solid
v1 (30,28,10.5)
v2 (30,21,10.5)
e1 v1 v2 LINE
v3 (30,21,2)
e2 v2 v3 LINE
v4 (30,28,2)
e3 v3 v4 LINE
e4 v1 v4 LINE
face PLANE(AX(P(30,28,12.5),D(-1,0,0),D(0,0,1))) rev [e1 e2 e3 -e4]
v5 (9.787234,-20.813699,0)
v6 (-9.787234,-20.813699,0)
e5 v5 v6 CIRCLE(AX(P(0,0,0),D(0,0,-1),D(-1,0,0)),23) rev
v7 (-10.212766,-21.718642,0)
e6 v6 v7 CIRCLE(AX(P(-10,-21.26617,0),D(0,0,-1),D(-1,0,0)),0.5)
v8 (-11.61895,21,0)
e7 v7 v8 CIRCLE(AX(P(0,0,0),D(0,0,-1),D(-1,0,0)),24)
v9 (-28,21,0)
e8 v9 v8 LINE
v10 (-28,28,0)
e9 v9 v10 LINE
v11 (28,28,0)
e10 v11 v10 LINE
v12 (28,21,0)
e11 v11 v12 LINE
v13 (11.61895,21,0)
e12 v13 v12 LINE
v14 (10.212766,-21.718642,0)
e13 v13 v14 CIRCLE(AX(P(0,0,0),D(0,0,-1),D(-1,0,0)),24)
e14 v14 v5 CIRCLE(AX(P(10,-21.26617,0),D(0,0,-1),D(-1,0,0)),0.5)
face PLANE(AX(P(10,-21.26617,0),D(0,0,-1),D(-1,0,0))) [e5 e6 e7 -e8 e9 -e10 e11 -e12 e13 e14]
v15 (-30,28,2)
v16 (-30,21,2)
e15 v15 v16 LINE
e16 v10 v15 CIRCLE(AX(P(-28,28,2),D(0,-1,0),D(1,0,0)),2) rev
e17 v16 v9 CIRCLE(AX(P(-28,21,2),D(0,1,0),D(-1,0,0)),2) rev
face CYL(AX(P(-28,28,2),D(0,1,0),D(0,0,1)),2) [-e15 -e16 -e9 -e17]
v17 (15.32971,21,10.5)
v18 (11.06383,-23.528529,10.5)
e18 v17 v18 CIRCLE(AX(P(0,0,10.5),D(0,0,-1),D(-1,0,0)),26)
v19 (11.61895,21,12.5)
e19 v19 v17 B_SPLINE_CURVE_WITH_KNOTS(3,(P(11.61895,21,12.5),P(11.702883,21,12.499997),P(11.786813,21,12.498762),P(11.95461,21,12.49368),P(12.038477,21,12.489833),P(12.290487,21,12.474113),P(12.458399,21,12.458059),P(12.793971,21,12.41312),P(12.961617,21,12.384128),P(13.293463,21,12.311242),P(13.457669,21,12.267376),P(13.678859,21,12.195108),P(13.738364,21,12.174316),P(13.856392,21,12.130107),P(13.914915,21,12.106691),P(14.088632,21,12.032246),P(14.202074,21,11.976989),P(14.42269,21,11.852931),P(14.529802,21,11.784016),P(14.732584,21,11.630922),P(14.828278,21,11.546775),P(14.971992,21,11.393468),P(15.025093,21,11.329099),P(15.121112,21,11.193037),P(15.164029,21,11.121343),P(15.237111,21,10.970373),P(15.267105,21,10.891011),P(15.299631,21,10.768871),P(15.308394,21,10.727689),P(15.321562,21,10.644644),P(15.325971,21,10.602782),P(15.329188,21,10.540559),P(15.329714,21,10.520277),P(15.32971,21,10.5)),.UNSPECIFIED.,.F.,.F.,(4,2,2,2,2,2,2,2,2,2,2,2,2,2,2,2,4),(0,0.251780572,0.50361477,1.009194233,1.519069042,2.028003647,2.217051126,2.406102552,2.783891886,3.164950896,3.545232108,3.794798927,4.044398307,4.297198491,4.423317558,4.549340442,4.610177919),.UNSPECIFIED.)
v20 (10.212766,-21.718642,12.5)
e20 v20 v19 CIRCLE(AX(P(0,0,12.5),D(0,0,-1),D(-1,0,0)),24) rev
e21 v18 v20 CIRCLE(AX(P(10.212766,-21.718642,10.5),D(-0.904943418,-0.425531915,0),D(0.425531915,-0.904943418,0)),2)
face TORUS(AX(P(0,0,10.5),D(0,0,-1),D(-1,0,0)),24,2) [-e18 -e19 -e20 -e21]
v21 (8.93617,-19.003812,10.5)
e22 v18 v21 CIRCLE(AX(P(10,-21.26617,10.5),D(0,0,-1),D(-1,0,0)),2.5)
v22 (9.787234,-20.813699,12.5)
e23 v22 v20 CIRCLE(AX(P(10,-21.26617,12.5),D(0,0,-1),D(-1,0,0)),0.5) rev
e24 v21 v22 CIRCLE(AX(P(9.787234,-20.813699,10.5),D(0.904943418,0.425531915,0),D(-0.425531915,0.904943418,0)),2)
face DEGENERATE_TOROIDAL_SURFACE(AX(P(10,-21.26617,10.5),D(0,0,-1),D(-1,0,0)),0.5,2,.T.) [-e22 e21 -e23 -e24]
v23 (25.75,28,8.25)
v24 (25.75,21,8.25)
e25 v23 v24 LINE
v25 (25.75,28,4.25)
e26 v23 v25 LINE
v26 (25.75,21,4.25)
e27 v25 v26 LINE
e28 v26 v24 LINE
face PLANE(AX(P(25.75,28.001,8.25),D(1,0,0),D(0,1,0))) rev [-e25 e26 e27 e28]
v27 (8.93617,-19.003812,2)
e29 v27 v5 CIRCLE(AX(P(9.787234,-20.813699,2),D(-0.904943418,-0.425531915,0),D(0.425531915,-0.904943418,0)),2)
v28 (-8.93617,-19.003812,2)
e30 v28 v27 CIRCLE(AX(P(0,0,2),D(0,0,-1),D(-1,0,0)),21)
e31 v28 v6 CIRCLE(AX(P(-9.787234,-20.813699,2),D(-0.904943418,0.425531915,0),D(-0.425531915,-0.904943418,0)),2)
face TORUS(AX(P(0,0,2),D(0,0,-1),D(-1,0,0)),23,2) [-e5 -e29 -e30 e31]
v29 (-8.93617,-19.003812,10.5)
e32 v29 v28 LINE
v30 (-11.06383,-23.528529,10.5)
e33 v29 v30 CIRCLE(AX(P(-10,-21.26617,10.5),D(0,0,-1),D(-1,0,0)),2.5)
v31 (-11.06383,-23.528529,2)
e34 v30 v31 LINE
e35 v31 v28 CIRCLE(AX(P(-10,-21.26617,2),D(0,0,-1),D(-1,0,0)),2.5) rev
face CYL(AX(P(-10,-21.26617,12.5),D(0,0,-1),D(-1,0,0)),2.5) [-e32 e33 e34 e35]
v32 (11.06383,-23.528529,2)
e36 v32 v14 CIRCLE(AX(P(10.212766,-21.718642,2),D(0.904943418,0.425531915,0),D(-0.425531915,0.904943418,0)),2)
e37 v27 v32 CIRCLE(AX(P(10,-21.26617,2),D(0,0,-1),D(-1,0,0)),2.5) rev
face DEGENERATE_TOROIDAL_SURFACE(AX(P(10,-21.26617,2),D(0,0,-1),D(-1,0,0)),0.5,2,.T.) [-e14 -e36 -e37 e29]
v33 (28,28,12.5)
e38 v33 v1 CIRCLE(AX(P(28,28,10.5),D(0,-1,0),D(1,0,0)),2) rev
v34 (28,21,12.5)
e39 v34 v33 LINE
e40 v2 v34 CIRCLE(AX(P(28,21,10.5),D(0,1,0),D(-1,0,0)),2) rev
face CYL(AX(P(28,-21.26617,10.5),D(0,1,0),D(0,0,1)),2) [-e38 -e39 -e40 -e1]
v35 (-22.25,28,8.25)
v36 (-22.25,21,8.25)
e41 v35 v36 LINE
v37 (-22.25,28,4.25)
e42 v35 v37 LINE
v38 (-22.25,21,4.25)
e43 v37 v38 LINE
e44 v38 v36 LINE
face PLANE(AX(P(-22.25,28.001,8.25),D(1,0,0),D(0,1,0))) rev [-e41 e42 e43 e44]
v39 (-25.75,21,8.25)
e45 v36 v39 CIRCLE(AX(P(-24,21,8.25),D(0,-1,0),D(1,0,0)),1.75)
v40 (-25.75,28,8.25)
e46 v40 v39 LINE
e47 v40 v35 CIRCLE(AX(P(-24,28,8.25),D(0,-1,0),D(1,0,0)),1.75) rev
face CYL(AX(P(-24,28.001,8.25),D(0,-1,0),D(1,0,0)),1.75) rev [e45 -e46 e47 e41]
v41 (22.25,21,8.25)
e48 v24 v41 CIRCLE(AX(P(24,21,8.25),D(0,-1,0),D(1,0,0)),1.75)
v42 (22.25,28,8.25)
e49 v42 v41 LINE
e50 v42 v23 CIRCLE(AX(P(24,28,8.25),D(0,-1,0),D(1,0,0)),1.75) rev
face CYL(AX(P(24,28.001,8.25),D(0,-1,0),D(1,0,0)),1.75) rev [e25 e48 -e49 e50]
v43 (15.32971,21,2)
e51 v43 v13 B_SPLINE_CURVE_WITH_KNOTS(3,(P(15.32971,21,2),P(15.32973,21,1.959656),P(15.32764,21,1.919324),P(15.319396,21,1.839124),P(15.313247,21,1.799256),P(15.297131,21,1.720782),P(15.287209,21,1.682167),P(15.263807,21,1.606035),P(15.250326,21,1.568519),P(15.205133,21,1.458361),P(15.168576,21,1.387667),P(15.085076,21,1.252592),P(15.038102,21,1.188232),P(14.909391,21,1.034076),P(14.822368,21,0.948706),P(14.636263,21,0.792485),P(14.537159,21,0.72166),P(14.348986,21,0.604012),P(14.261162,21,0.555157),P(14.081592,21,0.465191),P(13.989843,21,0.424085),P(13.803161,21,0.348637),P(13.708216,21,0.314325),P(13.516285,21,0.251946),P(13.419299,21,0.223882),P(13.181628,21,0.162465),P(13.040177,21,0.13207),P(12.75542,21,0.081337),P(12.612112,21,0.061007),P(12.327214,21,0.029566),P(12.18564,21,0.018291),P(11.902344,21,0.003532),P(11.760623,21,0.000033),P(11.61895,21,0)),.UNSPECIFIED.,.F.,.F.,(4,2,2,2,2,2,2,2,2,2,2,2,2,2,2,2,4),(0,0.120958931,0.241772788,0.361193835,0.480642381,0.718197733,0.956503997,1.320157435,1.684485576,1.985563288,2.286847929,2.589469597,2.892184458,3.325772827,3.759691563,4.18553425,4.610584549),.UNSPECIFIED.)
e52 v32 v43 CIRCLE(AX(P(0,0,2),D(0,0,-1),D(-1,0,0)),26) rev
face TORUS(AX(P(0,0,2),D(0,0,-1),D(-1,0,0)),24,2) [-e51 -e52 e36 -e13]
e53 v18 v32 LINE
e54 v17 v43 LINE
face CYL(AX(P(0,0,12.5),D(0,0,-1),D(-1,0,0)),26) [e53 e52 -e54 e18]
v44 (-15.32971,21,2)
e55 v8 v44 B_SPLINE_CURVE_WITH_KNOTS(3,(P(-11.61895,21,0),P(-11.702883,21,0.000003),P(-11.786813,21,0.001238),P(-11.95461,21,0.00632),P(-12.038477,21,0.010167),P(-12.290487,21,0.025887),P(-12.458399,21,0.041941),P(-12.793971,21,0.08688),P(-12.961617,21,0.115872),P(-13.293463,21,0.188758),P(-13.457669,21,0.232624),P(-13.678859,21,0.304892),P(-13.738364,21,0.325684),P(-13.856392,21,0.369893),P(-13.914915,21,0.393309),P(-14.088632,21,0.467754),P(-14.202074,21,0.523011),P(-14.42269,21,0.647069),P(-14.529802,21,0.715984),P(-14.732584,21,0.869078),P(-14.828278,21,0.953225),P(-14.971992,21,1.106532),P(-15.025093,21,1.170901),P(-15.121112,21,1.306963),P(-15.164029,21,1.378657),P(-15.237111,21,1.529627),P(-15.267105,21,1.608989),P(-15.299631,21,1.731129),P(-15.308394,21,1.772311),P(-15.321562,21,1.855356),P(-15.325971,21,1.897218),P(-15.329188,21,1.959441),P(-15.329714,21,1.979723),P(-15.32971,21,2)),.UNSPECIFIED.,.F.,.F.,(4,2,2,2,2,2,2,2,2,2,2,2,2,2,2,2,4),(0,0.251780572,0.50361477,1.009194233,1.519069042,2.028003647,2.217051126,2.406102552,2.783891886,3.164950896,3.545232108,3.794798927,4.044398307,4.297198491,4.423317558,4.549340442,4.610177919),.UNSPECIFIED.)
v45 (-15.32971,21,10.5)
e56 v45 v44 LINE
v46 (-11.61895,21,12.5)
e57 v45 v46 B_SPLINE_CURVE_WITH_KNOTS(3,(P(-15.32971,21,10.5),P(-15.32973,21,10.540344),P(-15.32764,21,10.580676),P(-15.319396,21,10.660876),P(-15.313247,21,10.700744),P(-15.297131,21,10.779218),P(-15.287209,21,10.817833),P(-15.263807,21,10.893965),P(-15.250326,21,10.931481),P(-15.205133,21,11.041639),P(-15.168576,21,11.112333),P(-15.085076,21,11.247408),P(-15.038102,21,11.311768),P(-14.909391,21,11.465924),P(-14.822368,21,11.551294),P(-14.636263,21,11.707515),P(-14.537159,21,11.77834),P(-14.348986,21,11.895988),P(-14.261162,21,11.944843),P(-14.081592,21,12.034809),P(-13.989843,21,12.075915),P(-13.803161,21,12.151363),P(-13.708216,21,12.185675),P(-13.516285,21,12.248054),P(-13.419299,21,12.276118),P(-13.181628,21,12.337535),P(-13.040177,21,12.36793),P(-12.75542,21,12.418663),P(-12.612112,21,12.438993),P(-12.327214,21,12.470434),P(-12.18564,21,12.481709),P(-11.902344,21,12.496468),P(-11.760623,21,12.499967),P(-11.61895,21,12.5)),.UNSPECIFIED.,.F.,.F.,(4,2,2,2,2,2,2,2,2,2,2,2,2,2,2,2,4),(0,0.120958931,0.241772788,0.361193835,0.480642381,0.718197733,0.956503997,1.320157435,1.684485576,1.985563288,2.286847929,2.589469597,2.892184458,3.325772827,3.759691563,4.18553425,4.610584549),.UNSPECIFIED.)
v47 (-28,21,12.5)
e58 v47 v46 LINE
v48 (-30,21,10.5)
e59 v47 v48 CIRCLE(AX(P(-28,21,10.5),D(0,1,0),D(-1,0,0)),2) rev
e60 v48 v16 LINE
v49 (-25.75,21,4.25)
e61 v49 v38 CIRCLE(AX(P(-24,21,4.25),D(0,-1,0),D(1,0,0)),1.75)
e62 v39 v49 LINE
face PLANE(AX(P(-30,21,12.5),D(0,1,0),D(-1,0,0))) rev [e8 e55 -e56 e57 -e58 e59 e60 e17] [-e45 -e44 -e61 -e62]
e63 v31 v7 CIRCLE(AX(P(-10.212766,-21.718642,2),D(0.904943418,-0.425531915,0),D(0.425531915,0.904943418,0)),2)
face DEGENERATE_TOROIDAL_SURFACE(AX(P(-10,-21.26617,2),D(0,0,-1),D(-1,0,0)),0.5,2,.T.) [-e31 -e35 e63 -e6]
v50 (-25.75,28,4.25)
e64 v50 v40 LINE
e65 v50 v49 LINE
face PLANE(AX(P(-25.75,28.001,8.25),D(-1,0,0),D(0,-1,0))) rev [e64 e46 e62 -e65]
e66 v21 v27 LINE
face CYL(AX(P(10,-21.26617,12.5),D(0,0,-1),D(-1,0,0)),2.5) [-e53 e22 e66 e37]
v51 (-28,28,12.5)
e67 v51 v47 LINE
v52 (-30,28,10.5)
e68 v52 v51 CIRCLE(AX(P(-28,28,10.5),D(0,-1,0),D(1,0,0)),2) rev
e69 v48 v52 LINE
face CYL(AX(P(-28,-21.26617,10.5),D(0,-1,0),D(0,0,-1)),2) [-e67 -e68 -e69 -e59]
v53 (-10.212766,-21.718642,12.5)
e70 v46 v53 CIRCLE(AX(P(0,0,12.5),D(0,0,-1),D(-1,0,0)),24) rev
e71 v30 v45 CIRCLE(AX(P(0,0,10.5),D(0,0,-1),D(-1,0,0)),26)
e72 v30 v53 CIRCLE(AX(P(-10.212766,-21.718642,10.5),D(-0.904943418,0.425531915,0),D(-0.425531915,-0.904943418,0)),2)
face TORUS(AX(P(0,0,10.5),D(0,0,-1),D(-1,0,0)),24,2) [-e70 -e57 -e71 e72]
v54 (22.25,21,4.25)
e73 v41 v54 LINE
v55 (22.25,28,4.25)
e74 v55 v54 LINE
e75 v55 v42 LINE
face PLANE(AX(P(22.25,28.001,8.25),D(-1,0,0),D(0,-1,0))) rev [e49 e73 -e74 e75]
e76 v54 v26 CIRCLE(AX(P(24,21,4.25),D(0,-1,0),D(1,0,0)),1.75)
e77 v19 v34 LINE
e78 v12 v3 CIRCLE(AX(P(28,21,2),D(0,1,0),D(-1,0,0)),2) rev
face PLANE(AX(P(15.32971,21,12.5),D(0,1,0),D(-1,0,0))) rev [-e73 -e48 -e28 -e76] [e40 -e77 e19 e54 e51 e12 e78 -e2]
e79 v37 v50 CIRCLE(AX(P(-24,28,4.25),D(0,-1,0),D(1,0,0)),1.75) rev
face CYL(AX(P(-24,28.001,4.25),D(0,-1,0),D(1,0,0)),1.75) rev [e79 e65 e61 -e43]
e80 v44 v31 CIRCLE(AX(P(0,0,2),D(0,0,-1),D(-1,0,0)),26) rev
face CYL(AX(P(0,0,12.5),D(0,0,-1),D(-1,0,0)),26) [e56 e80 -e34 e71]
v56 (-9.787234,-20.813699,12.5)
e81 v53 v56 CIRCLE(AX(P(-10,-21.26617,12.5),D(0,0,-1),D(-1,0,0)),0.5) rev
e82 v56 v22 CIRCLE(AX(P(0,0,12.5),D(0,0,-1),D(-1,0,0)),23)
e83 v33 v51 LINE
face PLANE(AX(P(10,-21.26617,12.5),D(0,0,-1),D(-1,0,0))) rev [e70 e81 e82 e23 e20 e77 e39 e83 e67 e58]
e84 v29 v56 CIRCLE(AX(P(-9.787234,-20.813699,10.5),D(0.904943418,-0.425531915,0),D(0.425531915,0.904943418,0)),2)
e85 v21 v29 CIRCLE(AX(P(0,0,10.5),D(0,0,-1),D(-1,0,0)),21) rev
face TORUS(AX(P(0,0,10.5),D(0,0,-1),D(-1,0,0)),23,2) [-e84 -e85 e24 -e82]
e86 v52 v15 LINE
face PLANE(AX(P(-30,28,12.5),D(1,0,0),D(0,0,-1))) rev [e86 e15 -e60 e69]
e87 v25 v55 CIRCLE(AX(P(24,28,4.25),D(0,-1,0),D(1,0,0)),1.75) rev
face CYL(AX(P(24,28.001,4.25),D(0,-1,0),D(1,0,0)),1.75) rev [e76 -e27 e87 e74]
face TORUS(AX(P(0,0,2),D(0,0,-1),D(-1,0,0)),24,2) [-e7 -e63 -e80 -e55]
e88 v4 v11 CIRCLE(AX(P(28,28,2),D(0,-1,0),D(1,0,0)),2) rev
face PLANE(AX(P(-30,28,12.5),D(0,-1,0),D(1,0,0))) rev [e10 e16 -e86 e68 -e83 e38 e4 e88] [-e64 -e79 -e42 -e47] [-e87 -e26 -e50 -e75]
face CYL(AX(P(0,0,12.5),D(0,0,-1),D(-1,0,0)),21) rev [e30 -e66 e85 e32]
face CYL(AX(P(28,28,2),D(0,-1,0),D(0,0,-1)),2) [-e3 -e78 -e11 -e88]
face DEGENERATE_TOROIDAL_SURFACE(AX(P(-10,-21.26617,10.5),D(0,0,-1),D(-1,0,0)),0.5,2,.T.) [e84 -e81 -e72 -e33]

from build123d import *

# Parameters (mm, degrees)
SALIENTE_EXTRUIR1_DEPTH = 12.5
REDONDEO1_R             = 2
CORTAR_EXTRUIR1_REACH   = 57.32


with BuildPart() as part:
    # Croquis1 → Saliente-Extruir1 (new body)
    with BuildSketch(Plane.XY):
        with BuildLine():
            Line((-30, 28), (30, 28))
            Line((30, 28), (30, 21))
            Line((30, 21), (15.329709717, 21))
            ThreePointArc((15.329709717, 21), (25.881503097, -2.479475236), (11.063829787, -23.528528863))
            ThreePointArc((11.063829787, -23.528528863), (7.737641456, -22.330000105), (8.936170213, -19.003811774))
            ThreePointArc((8.936170213, -19.003811774), (0, 21), (-8.936170213, -19.003811774))
            ThreePointArc((-8.936170213, -19.003811774), (-7.737641456, -22.330000105), (-11.063829787, -23.528528863))
            ThreePointArc((-11.063829787, -23.528528863), (-25.881503097, -2.479475236), (-15.329709717, 21))
            Line((-15.329709717, 21), (-30, 21))
            Line((-30, 21), (-30, 28))
        make_face()
    extrude(amount=SALIENTE_EXTRUIR1_DEPTH)

    # Redondeo1
    # the kernel refuses this fillet: 2 mm, written as the material it takes off along each edge
    with BuildSketch(Plane(origin=(0, 0, 0), x_dir=(-0.4255319148936173, -0.9049434177930525, 0), z_dir=(0.9049434177930525, -0.4255319148936173, 0))) as redondeo1_piece_1_section:
        with BuildLine():
            CenterArc((26 - REDONDEO1_R, -REDONDEO1_R), REDONDEO1_R, 0, 90)
            Line((26 - REDONDEO1_R, 0), (26, 0))
            Line((26, 0), (26, -REDONDEO1_R))
        make_face()
    redondeo1_piece_1 = revolve(axis=Axis((0, 0, 0), (0, 0, -1)), revolution_arc=129.712854224, mode=Mode.PRIVATE)
    redondeo1_piece_1 = split(redondeo1_piece_1, bisect_by=Plane(origin=(-25.427272667, 21, 0.558955185), z_dir=(0, -1, 0)), keep=Keep.TOP, mode=Mode.PRIVATE)
    add(redondeo1_piece_1, mode=Mode.SUBTRACT)
    with BuildSketch(Plane(origin=(-30, 16, 0), x_dir=(0, 0, 1), z_dir=(0, 1, 0)), Plane(origin=(30, 33, 0), x_dir=(0, 0, 1), z_dir=(0, -1, 0))) as redondeo1_piece_2:
        with BuildLine():
            CenterArc((REDONDEO1_R, REDONDEO1_R), REDONDEO1_R, 180, 90)
            Line((0, REDONDEO1_R), (0, 0))
            Line((0, 0), (REDONDEO1_R, 0))
        make_face()
    extrude(amount=17, mode=Mode.SUBTRACT)
    with BuildSketch(Plane(origin=(0, 0, 0), x_dir=(0.4242438227476812, 0.9055479992029324, 0), z_dir=(-0.9055479992029324, 0.4242438227476812, 0))) as redondeo1_piece_3_section:
        with BuildLine():
            CenterArc((26 - REDONDEO1_R, -REDONDEO1_R), REDONDEO1_R, 0, 90)
            Line((26 - REDONDEO1_R, 0), (26, 0))
            Line((26, 0), (26, -REDONDEO1_R))
        make_face()
    redondeo1_piece_3 = revolve(axis=Axis((0, 0, 0), (0, 0, -1)), revolution_arc=129.712854224, mode=Mode.PRIVATE)
    redondeo1_piece_3 = split(redondeo1_piece_3, bisect_by=Plane(origin=(25.427272718, 21, 0.558955134), z_dir=(0, -1, 0)), keep=Keep.TOP, mode=Mode.PRIVATE)
    add(redondeo1_piece_3, mode=Mode.SUBTRACT)
    with BuildSketch(Plane(origin=(10, -21.266170318, 0), x_dir=(0.42553191489361814, -0.9049434177930521, 0), z_dir=(0.9049434177930521, 0.42553191489361814, 0))) as redondeo1_piece_4:
        with BuildLine():
            CenterArc((2.5 - REDONDEO1_R, -REDONDEO1_R), REDONDEO1_R, 0, 90)
            Line((2.5 - REDONDEO1_R, 0), (2.5, 0))
            Line((2.5, 0), (2.5, -REDONDEO1_R))
        make_face()
    revolve(axis=Axis((10, -21.266170318, 0), (0, 0, -1)), revolution_arc=180, mode=Mode.SUBTRACT)
    with BuildSketch(Plane(origin=(30, 33, 12.5), x_dir=(0, 0, -1), z_dir=(0, -1, 0)), Plane(origin=(-30, 16, 12.5), x_dir=(0, 0, -1), z_dir=(0, 1, 0))) as redondeo1_piece_5:
        with BuildLine():
            CenterArc((REDONDEO1_R, -REDONDEO1_R), REDONDEO1_R, 90, 90)
            Line((0, -REDONDEO1_R), (0, 0))
            Line((0, 0), (REDONDEO1_R, 0))
        make_face()
    extrude(amount=17, mode=Mode.SUBTRACT)
    with BuildSketch(Plane(origin=(0, 0, 12.5), x_dir=(-0.4255319148936173, -0.9049434177930525, 0), z_dir=(0.9049434177930525, -0.4255319148936173, 0))) as redondeo1_piece_6_section:
        with BuildLine():
            CenterArc((26 - REDONDEO1_R, REDONDEO1_R), REDONDEO1_R, 270, 90)
            Line((26 - REDONDEO1_R, 0), (26, 0))
            Line((26, 0), (26, REDONDEO1_R))
        make_face()
    redondeo1_piece_6 = revolve(axis=Axis((0, 0, 12.5), (0, 0, -1)), revolution_arc=129.712854224, mode=Mode.PRIVATE)
    redondeo1_piece_6 = split(redondeo1_piece_6, bisect_by=Plane(origin=(-25.427272667, 21, 11.941044815), z_dir=(0, -1, 0)), keep=Keep.TOP, mode=Mode.PRIVATE)
    add(redondeo1_piece_6, mode=Mode.SUBTRACT)
    with BuildSketch(Plane(origin=(-10, -21.266170318, 12.5), x_dir=(0.42553191489361525, 0.9049434177930535, 0), z_dir=(-0.9049434177930535, 0.42553191489361525, 0))) as redondeo1_piece_7:
        with BuildLine():
            CenterArc((2.5 - REDONDEO1_R, REDONDEO1_R), REDONDEO1_R, 270, 90)
            Line((2.5 - REDONDEO1_R, 0), (2.5, 0))
            Line((2.5, 0), (2.5, REDONDEO1_R))
        make_face()
    revolve(axis=Axis((-10, -21.266170318, 12.5), (0, 0, -1)), revolution_arc=180, mode=Mode.SUBTRACT)
    with BuildSketch(Plane(origin=(0, 0, 12.5), x_dir=(0.4255319148936173, -0.9049434177930525, 0), z_dir=(-0.9049434177930525, -0.4255319148936173, 0))) as redondeo1_piece_8:
        with BuildLine():
            CenterArc((21 + REDONDEO1_R, -REDONDEO1_R), REDONDEO1_R, 90, 90)
            Line((21 + REDONDEO1_R, 0), (21, 0))
            Line((21, 0), (21, -REDONDEO1_R))
        make_face()
    revolve(axis=Axis((0, 0, 12.5), (0, 0, 1)), revolution_arc=309.631326932, mode=Mode.SUBTRACT)
    with BuildSketch(Plane(origin=(10, -21.266170318, 12.5), x_dir=(0.42553191489361814, -0.9049434177930521, 0), z_dir=(0.9049434177930521, 0.42553191489361814, 0))) as redondeo1_piece_9:
        with BuildLine():
            CenterArc((2.5 - REDONDEO1_R, REDONDEO1_R), REDONDEO1_R, 270, 90)
            Line((2.5 - REDONDEO1_R, 0), (2.5, 0))
            Line((2.5, 0), (2.5, REDONDEO1_R))
        make_face()
    revolve(axis=Axis((10, -21.266170318, 12.5), (0, 0, -1)), revolution_arc=180, mode=Mode.SUBTRACT)
    with BuildSketch(Plane(origin=(0, 0, 12.5), x_dir=(0.4242438227476812, 0.9055479992029324, 0), z_dir=(-0.9055479992029324, 0.4242438227476812, 0))) as redondeo1_piece_10_section:
        with BuildLine():
            CenterArc((26 - REDONDEO1_R, REDONDEO1_R), REDONDEO1_R, 270, 90)
            Line((26 - REDONDEO1_R, 0), (26, 0))
            Line((26, 0), (26, REDONDEO1_R))
        make_face()
    redondeo1_piece_10 = revolve(axis=Axis((0, 0, 12.5), (0, 0, -1)), revolution_arc=129.712854224, mode=Mode.PRIVATE)
    redondeo1_piece_10 = split(redondeo1_piece_10, bisect_by=Plane(origin=(25.427272718, 21, 11.941044866), z_dir=(0, -1, 0)), keep=Keep.TOP, mode=Mode.PRIVATE)
    add(redondeo1_piece_10, mode=Mode.SUBTRACT)
    with BuildSketch(Plane(origin=(0, 0, 0), x_dir=(0.4255319148936173, -0.9049434177930525, 0), z_dir=(-0.9049434177930525, -0.4255319148936173, 0))) as redondeo1_piece_11:
        with BuildLine():
            CenterArc((21 + REDONDEO1_R, REDONDEO1_R), REDONDEO1_R, 180, 90)
            Line((21 + REDONDEO1_R, 0), (21, 0))
            Line((21, 0), (21, REDONDEO1_R))
        make_face()
    revolve(axis=Axis((0, 0, 0), (0, 0, 1)), revolution_arc=309.631326932, mode=Mode.SUBTRACT)
    with BuildSketch(Plane(origin=(-10, -21.266170318, 0), x_dir=(0.42553191489361525, 0.9049434177930535, 0), z_dir=(-0.9049434177930535, 0.42553191489361525, 0))) as redondeo1_piece_12:
        with BuildLine():
            CenterArc((2.5 - REDONDEO1_R, -REDONDEO1_R), REDONDEO1_R, 0, 90)
            Line((2.5 - REDONDEO1_R, 0), (2.5, 0))
            Line((2.5, 0), (2.5, -REDONDEO1_R))
        make_face()
    revolve(axis=Axis((-10, -21.266170318, 0), (0, 0, -1)), revolution_arc=180, mode=Mode.SUBTRACT)

    # Croquis3 → Cortar-Extruir1 (cut, up to next)
    with BuildSketch(Plane.XZ.offset(-21), mode=Mode.PRIVATE) as cortar_extruir1_sk1:
        with BuildLine():
            Line((-22.25, 8.25), (-22.25, 4.25))
            ThreePointArc((-22.25, 4.25), (-24, 2.5), (-25.75, 4.25))
            Line((-25.75, 4.25), (-25.75, 8.25))
            ThreePointArc((-25.75, 8.25), (-24, 10), (-22.25, 8.25))
        make_face()
    cortar_extruir1_tool1 = extrude(cortar_extruir1_sk1.sketch, amount=-CORTAR_EXTRUIR1_REACH, mode=Mode.PRIVATE) & part.part
    # Croquis3 → Cortar-Extruir1 (cut, up to next)
    with BuildSketch(Plane.XZ.offset(-21), mode=Mode.PRIVATE) as cortar_extruir1_sk2:
        with BuildLine():
            Line((25.75, 8.25), (25.75, 4.25))
            ThreePointArc((25.75, 4.25), (24, 2.5), (22.25, 4.25))
            Line((22.25, 4.25), (22.25, 8.25))
            ThreePointArc((22.25, 8.25), (24, 10), (25.75, 8.25))
        make_face()
    cortar_extruir1_tool2 = extrude(cortar_extruir1_sk2.sketch, amount=-CORTAR_EXTRUIR1_REACH, mode=Mode.PRIVATE) & part.part
    add(cortar_extruir1_tool1.solids().sort_by_distance((-24, 21, 6.25))[0], mode=Mode.SUBTRACT)
    add(cortar_extruir1_tool2.solids().sort_by_distance((24, 21, 6.25))[0], mode=Mode.SUBTRACT)


solid = part.part
